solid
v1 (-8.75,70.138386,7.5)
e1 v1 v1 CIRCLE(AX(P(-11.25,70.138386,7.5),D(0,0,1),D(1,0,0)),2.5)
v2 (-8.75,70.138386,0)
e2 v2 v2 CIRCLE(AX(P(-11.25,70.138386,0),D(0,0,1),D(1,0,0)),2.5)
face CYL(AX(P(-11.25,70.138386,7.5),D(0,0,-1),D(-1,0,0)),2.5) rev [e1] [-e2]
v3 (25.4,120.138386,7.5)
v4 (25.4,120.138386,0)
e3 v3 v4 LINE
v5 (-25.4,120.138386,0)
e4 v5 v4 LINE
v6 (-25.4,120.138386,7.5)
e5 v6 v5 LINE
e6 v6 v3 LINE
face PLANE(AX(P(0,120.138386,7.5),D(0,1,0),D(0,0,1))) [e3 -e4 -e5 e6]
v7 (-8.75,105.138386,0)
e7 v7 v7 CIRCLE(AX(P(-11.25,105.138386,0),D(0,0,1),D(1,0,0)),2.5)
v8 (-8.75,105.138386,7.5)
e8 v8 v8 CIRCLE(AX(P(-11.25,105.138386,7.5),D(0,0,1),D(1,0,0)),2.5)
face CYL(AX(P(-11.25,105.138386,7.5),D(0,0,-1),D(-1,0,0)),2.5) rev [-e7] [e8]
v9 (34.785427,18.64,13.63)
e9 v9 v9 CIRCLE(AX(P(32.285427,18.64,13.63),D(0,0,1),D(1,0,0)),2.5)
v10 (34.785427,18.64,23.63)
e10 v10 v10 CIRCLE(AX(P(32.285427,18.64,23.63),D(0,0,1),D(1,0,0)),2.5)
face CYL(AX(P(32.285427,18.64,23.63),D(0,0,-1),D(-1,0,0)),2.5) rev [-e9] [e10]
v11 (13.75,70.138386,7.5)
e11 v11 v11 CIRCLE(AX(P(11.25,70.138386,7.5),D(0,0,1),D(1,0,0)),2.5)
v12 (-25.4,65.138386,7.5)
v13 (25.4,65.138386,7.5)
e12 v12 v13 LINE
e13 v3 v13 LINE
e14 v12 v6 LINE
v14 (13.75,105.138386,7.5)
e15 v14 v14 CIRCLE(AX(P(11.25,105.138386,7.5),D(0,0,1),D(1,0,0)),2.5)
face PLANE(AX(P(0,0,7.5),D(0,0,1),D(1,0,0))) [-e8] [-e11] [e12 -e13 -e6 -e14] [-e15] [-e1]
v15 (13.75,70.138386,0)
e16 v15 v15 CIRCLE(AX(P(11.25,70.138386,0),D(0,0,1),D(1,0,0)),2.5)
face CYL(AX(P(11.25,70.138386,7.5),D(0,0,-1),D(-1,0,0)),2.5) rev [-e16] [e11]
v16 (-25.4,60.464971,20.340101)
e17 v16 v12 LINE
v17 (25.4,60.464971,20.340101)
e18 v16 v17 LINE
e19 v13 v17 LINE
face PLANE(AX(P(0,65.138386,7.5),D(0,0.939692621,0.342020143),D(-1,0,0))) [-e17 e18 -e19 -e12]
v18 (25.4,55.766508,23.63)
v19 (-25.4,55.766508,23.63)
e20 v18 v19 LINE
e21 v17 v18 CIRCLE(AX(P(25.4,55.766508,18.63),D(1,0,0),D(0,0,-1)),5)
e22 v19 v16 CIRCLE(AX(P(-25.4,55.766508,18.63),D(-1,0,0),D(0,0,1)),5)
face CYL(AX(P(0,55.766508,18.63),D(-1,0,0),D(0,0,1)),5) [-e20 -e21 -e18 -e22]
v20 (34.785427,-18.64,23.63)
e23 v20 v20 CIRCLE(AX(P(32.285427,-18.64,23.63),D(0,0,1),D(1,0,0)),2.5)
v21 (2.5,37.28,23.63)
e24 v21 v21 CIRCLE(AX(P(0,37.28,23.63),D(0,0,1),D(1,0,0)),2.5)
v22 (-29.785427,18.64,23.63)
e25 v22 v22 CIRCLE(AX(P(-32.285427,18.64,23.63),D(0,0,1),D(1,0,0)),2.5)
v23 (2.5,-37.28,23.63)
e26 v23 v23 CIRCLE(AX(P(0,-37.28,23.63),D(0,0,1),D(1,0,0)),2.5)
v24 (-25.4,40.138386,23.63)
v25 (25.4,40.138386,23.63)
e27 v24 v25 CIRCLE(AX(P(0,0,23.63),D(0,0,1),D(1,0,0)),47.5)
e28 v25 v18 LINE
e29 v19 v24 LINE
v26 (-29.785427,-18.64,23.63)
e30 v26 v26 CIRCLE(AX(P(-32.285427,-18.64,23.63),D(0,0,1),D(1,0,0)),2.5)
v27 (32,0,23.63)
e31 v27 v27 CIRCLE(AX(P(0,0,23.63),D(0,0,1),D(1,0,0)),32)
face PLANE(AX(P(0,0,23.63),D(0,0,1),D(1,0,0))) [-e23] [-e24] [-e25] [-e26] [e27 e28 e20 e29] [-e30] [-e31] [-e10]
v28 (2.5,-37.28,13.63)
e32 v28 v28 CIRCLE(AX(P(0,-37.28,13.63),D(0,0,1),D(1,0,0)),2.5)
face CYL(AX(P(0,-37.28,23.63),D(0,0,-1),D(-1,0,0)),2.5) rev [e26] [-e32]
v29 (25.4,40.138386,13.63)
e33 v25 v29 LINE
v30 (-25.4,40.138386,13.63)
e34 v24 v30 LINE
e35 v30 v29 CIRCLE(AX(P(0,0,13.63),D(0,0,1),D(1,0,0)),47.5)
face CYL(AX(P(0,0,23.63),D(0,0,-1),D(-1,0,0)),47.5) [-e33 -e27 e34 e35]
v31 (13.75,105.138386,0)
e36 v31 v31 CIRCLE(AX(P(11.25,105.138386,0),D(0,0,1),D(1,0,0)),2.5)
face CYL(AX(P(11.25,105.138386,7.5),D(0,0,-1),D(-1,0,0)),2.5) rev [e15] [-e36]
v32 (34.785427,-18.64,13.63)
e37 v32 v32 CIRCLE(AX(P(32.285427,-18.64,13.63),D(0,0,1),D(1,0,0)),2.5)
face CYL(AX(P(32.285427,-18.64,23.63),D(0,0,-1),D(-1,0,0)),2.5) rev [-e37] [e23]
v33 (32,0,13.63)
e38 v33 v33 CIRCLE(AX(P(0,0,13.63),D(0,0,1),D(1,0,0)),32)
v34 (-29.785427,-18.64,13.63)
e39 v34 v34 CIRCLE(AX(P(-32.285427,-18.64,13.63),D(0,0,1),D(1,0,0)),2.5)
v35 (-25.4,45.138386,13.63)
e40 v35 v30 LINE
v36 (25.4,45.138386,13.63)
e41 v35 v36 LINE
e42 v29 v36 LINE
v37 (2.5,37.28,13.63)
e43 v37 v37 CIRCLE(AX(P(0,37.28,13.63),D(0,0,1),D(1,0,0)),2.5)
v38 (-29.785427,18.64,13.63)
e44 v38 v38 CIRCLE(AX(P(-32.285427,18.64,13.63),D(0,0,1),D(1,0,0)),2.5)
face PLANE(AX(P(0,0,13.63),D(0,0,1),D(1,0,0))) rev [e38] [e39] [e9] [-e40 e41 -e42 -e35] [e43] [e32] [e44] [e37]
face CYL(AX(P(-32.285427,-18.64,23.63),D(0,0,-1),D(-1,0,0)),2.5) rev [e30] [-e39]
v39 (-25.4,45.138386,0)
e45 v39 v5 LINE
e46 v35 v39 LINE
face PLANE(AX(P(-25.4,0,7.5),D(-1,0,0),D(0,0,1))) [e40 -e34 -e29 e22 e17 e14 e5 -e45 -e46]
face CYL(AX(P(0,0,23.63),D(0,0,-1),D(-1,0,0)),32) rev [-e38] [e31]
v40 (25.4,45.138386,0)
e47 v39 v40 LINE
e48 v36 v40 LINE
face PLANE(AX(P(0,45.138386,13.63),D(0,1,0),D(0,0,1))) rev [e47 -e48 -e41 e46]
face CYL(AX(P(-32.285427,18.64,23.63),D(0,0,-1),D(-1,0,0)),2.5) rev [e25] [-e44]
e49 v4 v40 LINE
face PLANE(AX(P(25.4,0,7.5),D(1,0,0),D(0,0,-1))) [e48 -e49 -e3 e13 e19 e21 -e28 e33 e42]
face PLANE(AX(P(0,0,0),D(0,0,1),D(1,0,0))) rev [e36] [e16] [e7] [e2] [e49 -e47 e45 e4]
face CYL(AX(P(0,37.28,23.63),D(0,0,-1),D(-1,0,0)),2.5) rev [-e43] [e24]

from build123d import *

# Parameters (mm, degrees)
SKETCH1_W           = 50.8
SKETCH1_H           = 65.000000038
SKETCH1_R           = 2.5
EXTRUDE_5_DEPTH     = 7.5
SKETCH1_3_W         = 50.8
SKETCH1_3_H         = 10
BOSS_EXTRUDE1_DEPTH = 13.63
BOSS_EXTRUDE2_START = 13.63
SKETCH1_4_R         = 2.5
SKETCH1_4_R_2       = 32
SKETCH1_4_W         = 50.8
SKETCH1_4_H         = 10
BOSS_EXTRUDE2_DEPTH = 10
CHAMFER1_SIZE       = 10
CHAMFER1_SIZE_2     = 27.474774195
FILLET1_R           = 5


with BuildPart() as part:
    # Sketch1 → 5 (new body)
    with BuildSketch(Plane.XY):
        with Locations((0, 87.638385637)):
            Rectangle(SKETCH1_W, SKETCH1_H)
        with Locations((-11.25, 70.138385656)):
            Circle(SKETCH1_R, mode=Mode.SUBTRACT)
        with Locations((-11.25, 105.138385656)):
            Circle(SKETCH1_R, mode=Mode.SUBTRACT)
        with Locations((11.25, 70.138385656)):
            Circle(SKETCH1_R, mode=Mode.SUBTRACT)
        with Locations((11.25, 105.138385656)):
            Circle(SKETCH1_R, mode=Mode.SUBTRACT)
    extrude(amount=EXTRUDE_5_DEPTH)

    # Sketch1<3> → Boss-Extrude1 (add)
    with BuildSketch(Plane.XY):
        with Locations((0, 50.138385618)):
            Rectangle(SKETCH1_3_W, SKETCH1_3_H)
    extrude(amount=BOSS_EXTRUDE1_DEPTH)

    # Sketch1<4> → Boss-Extrude2 (add)
    # profile 1 of 2: a face of its own
    with BuildSketch(Plane.XY.offset(BOSS_EXTRUDE2_START)):
        with BuildLine():
            Line((-25.4, 45.138385618), (-25.4, 40.138385618))
            ThreePointArc((-25.4, 40.138385618), (0, -47.5), (25.4, 40.138385618))
            Line((25.4, 40.138385618), (25.4, 45.138385618))
            Line((25.4, 45.138385618), (-25.4, 45.138385618))
        make_face()
        with Locations((-32.285427053, -18.64)):
            Circle(SKETCH1_4_R, mode=Mode.SUBTRACT)
        with Locations((-32.285427053, 18.64)):
            Circle(SKETCH1_4_R, mode=Mode.SUBTRACT)
        with Locations((0, -37.28)):
            Circle(SKETCH1_4_R, mode=Mode.SUBTRACT)
        with Locations((32.285427053, -18.64)):
            Circle(SKETCH1_4_R, mode=Mode.SUBTRACT)
        Circle(SKETCH1_4_R_2, mode=Mode.SUBTRACT)
        with Locations((32.285427053, 18.64)):
            Circle(SKETCH1_4_R, mode=Mode.SUBTRACT)
        with Locations((0, 37.28)):
            Circle(SKETCH1_4_R, mode=Mode.SUBTRACT)
    # profile 2 of 2: a face of its own
    with BuildSketch(Plane.XY.offset(BOSS_EXTRUDE2_START)):
        with Locations((0, 50.138385618)):
            Rectangle(SKETCH1_4_W, SKETCH1_4_H)
    extrude(amount=BOSS_EXTRUDE2_DEPTH)

    # Chamfer1
    # the kernel refuses this chamfer: 27.474774195, 10 mm, written as the material it adds along each edge
    with BuildSketch(Plane(origin=(-25.4, 55.138385618, 7.5), x_dir=(0, 0.9950833631817486, -0.0990409022520505), z_dir=(1, 0, 0))) as chamfer1_piece_1_section:
        Polygon((CHAMFER1_SIZE * 0.995083363182, CHAMFER1_SIZE * 0.0990409022521), (-CHAMFER1_SIZE_2 * 0.0990409022504, CHAMFER1_SIZE_2 * 0.995083363165), (0, 0), align=None)
    chamfer1_piece_1 = extrude(amount=50.8, mode=Mode.PRIVATE)
    chamfer1_piece_1 = split(chamfer1_piece_1, bisect_by=Plane(origin=(0, 58.754193251, 23.63), z_dir=(0, 0, -1)), keep=Keep.TOP, mode=Mode.PRIVATE)
    add(chamfer1_piece_1)

    # Fillet1
    fillet1_edges = [part.edges().sort_by_distance(p)[0] for p in [
        (0, 59.267545739, 23.63),
    ]]
    fillet(fillet1_edges, radius=FILLET1_R)


solid = part.part
